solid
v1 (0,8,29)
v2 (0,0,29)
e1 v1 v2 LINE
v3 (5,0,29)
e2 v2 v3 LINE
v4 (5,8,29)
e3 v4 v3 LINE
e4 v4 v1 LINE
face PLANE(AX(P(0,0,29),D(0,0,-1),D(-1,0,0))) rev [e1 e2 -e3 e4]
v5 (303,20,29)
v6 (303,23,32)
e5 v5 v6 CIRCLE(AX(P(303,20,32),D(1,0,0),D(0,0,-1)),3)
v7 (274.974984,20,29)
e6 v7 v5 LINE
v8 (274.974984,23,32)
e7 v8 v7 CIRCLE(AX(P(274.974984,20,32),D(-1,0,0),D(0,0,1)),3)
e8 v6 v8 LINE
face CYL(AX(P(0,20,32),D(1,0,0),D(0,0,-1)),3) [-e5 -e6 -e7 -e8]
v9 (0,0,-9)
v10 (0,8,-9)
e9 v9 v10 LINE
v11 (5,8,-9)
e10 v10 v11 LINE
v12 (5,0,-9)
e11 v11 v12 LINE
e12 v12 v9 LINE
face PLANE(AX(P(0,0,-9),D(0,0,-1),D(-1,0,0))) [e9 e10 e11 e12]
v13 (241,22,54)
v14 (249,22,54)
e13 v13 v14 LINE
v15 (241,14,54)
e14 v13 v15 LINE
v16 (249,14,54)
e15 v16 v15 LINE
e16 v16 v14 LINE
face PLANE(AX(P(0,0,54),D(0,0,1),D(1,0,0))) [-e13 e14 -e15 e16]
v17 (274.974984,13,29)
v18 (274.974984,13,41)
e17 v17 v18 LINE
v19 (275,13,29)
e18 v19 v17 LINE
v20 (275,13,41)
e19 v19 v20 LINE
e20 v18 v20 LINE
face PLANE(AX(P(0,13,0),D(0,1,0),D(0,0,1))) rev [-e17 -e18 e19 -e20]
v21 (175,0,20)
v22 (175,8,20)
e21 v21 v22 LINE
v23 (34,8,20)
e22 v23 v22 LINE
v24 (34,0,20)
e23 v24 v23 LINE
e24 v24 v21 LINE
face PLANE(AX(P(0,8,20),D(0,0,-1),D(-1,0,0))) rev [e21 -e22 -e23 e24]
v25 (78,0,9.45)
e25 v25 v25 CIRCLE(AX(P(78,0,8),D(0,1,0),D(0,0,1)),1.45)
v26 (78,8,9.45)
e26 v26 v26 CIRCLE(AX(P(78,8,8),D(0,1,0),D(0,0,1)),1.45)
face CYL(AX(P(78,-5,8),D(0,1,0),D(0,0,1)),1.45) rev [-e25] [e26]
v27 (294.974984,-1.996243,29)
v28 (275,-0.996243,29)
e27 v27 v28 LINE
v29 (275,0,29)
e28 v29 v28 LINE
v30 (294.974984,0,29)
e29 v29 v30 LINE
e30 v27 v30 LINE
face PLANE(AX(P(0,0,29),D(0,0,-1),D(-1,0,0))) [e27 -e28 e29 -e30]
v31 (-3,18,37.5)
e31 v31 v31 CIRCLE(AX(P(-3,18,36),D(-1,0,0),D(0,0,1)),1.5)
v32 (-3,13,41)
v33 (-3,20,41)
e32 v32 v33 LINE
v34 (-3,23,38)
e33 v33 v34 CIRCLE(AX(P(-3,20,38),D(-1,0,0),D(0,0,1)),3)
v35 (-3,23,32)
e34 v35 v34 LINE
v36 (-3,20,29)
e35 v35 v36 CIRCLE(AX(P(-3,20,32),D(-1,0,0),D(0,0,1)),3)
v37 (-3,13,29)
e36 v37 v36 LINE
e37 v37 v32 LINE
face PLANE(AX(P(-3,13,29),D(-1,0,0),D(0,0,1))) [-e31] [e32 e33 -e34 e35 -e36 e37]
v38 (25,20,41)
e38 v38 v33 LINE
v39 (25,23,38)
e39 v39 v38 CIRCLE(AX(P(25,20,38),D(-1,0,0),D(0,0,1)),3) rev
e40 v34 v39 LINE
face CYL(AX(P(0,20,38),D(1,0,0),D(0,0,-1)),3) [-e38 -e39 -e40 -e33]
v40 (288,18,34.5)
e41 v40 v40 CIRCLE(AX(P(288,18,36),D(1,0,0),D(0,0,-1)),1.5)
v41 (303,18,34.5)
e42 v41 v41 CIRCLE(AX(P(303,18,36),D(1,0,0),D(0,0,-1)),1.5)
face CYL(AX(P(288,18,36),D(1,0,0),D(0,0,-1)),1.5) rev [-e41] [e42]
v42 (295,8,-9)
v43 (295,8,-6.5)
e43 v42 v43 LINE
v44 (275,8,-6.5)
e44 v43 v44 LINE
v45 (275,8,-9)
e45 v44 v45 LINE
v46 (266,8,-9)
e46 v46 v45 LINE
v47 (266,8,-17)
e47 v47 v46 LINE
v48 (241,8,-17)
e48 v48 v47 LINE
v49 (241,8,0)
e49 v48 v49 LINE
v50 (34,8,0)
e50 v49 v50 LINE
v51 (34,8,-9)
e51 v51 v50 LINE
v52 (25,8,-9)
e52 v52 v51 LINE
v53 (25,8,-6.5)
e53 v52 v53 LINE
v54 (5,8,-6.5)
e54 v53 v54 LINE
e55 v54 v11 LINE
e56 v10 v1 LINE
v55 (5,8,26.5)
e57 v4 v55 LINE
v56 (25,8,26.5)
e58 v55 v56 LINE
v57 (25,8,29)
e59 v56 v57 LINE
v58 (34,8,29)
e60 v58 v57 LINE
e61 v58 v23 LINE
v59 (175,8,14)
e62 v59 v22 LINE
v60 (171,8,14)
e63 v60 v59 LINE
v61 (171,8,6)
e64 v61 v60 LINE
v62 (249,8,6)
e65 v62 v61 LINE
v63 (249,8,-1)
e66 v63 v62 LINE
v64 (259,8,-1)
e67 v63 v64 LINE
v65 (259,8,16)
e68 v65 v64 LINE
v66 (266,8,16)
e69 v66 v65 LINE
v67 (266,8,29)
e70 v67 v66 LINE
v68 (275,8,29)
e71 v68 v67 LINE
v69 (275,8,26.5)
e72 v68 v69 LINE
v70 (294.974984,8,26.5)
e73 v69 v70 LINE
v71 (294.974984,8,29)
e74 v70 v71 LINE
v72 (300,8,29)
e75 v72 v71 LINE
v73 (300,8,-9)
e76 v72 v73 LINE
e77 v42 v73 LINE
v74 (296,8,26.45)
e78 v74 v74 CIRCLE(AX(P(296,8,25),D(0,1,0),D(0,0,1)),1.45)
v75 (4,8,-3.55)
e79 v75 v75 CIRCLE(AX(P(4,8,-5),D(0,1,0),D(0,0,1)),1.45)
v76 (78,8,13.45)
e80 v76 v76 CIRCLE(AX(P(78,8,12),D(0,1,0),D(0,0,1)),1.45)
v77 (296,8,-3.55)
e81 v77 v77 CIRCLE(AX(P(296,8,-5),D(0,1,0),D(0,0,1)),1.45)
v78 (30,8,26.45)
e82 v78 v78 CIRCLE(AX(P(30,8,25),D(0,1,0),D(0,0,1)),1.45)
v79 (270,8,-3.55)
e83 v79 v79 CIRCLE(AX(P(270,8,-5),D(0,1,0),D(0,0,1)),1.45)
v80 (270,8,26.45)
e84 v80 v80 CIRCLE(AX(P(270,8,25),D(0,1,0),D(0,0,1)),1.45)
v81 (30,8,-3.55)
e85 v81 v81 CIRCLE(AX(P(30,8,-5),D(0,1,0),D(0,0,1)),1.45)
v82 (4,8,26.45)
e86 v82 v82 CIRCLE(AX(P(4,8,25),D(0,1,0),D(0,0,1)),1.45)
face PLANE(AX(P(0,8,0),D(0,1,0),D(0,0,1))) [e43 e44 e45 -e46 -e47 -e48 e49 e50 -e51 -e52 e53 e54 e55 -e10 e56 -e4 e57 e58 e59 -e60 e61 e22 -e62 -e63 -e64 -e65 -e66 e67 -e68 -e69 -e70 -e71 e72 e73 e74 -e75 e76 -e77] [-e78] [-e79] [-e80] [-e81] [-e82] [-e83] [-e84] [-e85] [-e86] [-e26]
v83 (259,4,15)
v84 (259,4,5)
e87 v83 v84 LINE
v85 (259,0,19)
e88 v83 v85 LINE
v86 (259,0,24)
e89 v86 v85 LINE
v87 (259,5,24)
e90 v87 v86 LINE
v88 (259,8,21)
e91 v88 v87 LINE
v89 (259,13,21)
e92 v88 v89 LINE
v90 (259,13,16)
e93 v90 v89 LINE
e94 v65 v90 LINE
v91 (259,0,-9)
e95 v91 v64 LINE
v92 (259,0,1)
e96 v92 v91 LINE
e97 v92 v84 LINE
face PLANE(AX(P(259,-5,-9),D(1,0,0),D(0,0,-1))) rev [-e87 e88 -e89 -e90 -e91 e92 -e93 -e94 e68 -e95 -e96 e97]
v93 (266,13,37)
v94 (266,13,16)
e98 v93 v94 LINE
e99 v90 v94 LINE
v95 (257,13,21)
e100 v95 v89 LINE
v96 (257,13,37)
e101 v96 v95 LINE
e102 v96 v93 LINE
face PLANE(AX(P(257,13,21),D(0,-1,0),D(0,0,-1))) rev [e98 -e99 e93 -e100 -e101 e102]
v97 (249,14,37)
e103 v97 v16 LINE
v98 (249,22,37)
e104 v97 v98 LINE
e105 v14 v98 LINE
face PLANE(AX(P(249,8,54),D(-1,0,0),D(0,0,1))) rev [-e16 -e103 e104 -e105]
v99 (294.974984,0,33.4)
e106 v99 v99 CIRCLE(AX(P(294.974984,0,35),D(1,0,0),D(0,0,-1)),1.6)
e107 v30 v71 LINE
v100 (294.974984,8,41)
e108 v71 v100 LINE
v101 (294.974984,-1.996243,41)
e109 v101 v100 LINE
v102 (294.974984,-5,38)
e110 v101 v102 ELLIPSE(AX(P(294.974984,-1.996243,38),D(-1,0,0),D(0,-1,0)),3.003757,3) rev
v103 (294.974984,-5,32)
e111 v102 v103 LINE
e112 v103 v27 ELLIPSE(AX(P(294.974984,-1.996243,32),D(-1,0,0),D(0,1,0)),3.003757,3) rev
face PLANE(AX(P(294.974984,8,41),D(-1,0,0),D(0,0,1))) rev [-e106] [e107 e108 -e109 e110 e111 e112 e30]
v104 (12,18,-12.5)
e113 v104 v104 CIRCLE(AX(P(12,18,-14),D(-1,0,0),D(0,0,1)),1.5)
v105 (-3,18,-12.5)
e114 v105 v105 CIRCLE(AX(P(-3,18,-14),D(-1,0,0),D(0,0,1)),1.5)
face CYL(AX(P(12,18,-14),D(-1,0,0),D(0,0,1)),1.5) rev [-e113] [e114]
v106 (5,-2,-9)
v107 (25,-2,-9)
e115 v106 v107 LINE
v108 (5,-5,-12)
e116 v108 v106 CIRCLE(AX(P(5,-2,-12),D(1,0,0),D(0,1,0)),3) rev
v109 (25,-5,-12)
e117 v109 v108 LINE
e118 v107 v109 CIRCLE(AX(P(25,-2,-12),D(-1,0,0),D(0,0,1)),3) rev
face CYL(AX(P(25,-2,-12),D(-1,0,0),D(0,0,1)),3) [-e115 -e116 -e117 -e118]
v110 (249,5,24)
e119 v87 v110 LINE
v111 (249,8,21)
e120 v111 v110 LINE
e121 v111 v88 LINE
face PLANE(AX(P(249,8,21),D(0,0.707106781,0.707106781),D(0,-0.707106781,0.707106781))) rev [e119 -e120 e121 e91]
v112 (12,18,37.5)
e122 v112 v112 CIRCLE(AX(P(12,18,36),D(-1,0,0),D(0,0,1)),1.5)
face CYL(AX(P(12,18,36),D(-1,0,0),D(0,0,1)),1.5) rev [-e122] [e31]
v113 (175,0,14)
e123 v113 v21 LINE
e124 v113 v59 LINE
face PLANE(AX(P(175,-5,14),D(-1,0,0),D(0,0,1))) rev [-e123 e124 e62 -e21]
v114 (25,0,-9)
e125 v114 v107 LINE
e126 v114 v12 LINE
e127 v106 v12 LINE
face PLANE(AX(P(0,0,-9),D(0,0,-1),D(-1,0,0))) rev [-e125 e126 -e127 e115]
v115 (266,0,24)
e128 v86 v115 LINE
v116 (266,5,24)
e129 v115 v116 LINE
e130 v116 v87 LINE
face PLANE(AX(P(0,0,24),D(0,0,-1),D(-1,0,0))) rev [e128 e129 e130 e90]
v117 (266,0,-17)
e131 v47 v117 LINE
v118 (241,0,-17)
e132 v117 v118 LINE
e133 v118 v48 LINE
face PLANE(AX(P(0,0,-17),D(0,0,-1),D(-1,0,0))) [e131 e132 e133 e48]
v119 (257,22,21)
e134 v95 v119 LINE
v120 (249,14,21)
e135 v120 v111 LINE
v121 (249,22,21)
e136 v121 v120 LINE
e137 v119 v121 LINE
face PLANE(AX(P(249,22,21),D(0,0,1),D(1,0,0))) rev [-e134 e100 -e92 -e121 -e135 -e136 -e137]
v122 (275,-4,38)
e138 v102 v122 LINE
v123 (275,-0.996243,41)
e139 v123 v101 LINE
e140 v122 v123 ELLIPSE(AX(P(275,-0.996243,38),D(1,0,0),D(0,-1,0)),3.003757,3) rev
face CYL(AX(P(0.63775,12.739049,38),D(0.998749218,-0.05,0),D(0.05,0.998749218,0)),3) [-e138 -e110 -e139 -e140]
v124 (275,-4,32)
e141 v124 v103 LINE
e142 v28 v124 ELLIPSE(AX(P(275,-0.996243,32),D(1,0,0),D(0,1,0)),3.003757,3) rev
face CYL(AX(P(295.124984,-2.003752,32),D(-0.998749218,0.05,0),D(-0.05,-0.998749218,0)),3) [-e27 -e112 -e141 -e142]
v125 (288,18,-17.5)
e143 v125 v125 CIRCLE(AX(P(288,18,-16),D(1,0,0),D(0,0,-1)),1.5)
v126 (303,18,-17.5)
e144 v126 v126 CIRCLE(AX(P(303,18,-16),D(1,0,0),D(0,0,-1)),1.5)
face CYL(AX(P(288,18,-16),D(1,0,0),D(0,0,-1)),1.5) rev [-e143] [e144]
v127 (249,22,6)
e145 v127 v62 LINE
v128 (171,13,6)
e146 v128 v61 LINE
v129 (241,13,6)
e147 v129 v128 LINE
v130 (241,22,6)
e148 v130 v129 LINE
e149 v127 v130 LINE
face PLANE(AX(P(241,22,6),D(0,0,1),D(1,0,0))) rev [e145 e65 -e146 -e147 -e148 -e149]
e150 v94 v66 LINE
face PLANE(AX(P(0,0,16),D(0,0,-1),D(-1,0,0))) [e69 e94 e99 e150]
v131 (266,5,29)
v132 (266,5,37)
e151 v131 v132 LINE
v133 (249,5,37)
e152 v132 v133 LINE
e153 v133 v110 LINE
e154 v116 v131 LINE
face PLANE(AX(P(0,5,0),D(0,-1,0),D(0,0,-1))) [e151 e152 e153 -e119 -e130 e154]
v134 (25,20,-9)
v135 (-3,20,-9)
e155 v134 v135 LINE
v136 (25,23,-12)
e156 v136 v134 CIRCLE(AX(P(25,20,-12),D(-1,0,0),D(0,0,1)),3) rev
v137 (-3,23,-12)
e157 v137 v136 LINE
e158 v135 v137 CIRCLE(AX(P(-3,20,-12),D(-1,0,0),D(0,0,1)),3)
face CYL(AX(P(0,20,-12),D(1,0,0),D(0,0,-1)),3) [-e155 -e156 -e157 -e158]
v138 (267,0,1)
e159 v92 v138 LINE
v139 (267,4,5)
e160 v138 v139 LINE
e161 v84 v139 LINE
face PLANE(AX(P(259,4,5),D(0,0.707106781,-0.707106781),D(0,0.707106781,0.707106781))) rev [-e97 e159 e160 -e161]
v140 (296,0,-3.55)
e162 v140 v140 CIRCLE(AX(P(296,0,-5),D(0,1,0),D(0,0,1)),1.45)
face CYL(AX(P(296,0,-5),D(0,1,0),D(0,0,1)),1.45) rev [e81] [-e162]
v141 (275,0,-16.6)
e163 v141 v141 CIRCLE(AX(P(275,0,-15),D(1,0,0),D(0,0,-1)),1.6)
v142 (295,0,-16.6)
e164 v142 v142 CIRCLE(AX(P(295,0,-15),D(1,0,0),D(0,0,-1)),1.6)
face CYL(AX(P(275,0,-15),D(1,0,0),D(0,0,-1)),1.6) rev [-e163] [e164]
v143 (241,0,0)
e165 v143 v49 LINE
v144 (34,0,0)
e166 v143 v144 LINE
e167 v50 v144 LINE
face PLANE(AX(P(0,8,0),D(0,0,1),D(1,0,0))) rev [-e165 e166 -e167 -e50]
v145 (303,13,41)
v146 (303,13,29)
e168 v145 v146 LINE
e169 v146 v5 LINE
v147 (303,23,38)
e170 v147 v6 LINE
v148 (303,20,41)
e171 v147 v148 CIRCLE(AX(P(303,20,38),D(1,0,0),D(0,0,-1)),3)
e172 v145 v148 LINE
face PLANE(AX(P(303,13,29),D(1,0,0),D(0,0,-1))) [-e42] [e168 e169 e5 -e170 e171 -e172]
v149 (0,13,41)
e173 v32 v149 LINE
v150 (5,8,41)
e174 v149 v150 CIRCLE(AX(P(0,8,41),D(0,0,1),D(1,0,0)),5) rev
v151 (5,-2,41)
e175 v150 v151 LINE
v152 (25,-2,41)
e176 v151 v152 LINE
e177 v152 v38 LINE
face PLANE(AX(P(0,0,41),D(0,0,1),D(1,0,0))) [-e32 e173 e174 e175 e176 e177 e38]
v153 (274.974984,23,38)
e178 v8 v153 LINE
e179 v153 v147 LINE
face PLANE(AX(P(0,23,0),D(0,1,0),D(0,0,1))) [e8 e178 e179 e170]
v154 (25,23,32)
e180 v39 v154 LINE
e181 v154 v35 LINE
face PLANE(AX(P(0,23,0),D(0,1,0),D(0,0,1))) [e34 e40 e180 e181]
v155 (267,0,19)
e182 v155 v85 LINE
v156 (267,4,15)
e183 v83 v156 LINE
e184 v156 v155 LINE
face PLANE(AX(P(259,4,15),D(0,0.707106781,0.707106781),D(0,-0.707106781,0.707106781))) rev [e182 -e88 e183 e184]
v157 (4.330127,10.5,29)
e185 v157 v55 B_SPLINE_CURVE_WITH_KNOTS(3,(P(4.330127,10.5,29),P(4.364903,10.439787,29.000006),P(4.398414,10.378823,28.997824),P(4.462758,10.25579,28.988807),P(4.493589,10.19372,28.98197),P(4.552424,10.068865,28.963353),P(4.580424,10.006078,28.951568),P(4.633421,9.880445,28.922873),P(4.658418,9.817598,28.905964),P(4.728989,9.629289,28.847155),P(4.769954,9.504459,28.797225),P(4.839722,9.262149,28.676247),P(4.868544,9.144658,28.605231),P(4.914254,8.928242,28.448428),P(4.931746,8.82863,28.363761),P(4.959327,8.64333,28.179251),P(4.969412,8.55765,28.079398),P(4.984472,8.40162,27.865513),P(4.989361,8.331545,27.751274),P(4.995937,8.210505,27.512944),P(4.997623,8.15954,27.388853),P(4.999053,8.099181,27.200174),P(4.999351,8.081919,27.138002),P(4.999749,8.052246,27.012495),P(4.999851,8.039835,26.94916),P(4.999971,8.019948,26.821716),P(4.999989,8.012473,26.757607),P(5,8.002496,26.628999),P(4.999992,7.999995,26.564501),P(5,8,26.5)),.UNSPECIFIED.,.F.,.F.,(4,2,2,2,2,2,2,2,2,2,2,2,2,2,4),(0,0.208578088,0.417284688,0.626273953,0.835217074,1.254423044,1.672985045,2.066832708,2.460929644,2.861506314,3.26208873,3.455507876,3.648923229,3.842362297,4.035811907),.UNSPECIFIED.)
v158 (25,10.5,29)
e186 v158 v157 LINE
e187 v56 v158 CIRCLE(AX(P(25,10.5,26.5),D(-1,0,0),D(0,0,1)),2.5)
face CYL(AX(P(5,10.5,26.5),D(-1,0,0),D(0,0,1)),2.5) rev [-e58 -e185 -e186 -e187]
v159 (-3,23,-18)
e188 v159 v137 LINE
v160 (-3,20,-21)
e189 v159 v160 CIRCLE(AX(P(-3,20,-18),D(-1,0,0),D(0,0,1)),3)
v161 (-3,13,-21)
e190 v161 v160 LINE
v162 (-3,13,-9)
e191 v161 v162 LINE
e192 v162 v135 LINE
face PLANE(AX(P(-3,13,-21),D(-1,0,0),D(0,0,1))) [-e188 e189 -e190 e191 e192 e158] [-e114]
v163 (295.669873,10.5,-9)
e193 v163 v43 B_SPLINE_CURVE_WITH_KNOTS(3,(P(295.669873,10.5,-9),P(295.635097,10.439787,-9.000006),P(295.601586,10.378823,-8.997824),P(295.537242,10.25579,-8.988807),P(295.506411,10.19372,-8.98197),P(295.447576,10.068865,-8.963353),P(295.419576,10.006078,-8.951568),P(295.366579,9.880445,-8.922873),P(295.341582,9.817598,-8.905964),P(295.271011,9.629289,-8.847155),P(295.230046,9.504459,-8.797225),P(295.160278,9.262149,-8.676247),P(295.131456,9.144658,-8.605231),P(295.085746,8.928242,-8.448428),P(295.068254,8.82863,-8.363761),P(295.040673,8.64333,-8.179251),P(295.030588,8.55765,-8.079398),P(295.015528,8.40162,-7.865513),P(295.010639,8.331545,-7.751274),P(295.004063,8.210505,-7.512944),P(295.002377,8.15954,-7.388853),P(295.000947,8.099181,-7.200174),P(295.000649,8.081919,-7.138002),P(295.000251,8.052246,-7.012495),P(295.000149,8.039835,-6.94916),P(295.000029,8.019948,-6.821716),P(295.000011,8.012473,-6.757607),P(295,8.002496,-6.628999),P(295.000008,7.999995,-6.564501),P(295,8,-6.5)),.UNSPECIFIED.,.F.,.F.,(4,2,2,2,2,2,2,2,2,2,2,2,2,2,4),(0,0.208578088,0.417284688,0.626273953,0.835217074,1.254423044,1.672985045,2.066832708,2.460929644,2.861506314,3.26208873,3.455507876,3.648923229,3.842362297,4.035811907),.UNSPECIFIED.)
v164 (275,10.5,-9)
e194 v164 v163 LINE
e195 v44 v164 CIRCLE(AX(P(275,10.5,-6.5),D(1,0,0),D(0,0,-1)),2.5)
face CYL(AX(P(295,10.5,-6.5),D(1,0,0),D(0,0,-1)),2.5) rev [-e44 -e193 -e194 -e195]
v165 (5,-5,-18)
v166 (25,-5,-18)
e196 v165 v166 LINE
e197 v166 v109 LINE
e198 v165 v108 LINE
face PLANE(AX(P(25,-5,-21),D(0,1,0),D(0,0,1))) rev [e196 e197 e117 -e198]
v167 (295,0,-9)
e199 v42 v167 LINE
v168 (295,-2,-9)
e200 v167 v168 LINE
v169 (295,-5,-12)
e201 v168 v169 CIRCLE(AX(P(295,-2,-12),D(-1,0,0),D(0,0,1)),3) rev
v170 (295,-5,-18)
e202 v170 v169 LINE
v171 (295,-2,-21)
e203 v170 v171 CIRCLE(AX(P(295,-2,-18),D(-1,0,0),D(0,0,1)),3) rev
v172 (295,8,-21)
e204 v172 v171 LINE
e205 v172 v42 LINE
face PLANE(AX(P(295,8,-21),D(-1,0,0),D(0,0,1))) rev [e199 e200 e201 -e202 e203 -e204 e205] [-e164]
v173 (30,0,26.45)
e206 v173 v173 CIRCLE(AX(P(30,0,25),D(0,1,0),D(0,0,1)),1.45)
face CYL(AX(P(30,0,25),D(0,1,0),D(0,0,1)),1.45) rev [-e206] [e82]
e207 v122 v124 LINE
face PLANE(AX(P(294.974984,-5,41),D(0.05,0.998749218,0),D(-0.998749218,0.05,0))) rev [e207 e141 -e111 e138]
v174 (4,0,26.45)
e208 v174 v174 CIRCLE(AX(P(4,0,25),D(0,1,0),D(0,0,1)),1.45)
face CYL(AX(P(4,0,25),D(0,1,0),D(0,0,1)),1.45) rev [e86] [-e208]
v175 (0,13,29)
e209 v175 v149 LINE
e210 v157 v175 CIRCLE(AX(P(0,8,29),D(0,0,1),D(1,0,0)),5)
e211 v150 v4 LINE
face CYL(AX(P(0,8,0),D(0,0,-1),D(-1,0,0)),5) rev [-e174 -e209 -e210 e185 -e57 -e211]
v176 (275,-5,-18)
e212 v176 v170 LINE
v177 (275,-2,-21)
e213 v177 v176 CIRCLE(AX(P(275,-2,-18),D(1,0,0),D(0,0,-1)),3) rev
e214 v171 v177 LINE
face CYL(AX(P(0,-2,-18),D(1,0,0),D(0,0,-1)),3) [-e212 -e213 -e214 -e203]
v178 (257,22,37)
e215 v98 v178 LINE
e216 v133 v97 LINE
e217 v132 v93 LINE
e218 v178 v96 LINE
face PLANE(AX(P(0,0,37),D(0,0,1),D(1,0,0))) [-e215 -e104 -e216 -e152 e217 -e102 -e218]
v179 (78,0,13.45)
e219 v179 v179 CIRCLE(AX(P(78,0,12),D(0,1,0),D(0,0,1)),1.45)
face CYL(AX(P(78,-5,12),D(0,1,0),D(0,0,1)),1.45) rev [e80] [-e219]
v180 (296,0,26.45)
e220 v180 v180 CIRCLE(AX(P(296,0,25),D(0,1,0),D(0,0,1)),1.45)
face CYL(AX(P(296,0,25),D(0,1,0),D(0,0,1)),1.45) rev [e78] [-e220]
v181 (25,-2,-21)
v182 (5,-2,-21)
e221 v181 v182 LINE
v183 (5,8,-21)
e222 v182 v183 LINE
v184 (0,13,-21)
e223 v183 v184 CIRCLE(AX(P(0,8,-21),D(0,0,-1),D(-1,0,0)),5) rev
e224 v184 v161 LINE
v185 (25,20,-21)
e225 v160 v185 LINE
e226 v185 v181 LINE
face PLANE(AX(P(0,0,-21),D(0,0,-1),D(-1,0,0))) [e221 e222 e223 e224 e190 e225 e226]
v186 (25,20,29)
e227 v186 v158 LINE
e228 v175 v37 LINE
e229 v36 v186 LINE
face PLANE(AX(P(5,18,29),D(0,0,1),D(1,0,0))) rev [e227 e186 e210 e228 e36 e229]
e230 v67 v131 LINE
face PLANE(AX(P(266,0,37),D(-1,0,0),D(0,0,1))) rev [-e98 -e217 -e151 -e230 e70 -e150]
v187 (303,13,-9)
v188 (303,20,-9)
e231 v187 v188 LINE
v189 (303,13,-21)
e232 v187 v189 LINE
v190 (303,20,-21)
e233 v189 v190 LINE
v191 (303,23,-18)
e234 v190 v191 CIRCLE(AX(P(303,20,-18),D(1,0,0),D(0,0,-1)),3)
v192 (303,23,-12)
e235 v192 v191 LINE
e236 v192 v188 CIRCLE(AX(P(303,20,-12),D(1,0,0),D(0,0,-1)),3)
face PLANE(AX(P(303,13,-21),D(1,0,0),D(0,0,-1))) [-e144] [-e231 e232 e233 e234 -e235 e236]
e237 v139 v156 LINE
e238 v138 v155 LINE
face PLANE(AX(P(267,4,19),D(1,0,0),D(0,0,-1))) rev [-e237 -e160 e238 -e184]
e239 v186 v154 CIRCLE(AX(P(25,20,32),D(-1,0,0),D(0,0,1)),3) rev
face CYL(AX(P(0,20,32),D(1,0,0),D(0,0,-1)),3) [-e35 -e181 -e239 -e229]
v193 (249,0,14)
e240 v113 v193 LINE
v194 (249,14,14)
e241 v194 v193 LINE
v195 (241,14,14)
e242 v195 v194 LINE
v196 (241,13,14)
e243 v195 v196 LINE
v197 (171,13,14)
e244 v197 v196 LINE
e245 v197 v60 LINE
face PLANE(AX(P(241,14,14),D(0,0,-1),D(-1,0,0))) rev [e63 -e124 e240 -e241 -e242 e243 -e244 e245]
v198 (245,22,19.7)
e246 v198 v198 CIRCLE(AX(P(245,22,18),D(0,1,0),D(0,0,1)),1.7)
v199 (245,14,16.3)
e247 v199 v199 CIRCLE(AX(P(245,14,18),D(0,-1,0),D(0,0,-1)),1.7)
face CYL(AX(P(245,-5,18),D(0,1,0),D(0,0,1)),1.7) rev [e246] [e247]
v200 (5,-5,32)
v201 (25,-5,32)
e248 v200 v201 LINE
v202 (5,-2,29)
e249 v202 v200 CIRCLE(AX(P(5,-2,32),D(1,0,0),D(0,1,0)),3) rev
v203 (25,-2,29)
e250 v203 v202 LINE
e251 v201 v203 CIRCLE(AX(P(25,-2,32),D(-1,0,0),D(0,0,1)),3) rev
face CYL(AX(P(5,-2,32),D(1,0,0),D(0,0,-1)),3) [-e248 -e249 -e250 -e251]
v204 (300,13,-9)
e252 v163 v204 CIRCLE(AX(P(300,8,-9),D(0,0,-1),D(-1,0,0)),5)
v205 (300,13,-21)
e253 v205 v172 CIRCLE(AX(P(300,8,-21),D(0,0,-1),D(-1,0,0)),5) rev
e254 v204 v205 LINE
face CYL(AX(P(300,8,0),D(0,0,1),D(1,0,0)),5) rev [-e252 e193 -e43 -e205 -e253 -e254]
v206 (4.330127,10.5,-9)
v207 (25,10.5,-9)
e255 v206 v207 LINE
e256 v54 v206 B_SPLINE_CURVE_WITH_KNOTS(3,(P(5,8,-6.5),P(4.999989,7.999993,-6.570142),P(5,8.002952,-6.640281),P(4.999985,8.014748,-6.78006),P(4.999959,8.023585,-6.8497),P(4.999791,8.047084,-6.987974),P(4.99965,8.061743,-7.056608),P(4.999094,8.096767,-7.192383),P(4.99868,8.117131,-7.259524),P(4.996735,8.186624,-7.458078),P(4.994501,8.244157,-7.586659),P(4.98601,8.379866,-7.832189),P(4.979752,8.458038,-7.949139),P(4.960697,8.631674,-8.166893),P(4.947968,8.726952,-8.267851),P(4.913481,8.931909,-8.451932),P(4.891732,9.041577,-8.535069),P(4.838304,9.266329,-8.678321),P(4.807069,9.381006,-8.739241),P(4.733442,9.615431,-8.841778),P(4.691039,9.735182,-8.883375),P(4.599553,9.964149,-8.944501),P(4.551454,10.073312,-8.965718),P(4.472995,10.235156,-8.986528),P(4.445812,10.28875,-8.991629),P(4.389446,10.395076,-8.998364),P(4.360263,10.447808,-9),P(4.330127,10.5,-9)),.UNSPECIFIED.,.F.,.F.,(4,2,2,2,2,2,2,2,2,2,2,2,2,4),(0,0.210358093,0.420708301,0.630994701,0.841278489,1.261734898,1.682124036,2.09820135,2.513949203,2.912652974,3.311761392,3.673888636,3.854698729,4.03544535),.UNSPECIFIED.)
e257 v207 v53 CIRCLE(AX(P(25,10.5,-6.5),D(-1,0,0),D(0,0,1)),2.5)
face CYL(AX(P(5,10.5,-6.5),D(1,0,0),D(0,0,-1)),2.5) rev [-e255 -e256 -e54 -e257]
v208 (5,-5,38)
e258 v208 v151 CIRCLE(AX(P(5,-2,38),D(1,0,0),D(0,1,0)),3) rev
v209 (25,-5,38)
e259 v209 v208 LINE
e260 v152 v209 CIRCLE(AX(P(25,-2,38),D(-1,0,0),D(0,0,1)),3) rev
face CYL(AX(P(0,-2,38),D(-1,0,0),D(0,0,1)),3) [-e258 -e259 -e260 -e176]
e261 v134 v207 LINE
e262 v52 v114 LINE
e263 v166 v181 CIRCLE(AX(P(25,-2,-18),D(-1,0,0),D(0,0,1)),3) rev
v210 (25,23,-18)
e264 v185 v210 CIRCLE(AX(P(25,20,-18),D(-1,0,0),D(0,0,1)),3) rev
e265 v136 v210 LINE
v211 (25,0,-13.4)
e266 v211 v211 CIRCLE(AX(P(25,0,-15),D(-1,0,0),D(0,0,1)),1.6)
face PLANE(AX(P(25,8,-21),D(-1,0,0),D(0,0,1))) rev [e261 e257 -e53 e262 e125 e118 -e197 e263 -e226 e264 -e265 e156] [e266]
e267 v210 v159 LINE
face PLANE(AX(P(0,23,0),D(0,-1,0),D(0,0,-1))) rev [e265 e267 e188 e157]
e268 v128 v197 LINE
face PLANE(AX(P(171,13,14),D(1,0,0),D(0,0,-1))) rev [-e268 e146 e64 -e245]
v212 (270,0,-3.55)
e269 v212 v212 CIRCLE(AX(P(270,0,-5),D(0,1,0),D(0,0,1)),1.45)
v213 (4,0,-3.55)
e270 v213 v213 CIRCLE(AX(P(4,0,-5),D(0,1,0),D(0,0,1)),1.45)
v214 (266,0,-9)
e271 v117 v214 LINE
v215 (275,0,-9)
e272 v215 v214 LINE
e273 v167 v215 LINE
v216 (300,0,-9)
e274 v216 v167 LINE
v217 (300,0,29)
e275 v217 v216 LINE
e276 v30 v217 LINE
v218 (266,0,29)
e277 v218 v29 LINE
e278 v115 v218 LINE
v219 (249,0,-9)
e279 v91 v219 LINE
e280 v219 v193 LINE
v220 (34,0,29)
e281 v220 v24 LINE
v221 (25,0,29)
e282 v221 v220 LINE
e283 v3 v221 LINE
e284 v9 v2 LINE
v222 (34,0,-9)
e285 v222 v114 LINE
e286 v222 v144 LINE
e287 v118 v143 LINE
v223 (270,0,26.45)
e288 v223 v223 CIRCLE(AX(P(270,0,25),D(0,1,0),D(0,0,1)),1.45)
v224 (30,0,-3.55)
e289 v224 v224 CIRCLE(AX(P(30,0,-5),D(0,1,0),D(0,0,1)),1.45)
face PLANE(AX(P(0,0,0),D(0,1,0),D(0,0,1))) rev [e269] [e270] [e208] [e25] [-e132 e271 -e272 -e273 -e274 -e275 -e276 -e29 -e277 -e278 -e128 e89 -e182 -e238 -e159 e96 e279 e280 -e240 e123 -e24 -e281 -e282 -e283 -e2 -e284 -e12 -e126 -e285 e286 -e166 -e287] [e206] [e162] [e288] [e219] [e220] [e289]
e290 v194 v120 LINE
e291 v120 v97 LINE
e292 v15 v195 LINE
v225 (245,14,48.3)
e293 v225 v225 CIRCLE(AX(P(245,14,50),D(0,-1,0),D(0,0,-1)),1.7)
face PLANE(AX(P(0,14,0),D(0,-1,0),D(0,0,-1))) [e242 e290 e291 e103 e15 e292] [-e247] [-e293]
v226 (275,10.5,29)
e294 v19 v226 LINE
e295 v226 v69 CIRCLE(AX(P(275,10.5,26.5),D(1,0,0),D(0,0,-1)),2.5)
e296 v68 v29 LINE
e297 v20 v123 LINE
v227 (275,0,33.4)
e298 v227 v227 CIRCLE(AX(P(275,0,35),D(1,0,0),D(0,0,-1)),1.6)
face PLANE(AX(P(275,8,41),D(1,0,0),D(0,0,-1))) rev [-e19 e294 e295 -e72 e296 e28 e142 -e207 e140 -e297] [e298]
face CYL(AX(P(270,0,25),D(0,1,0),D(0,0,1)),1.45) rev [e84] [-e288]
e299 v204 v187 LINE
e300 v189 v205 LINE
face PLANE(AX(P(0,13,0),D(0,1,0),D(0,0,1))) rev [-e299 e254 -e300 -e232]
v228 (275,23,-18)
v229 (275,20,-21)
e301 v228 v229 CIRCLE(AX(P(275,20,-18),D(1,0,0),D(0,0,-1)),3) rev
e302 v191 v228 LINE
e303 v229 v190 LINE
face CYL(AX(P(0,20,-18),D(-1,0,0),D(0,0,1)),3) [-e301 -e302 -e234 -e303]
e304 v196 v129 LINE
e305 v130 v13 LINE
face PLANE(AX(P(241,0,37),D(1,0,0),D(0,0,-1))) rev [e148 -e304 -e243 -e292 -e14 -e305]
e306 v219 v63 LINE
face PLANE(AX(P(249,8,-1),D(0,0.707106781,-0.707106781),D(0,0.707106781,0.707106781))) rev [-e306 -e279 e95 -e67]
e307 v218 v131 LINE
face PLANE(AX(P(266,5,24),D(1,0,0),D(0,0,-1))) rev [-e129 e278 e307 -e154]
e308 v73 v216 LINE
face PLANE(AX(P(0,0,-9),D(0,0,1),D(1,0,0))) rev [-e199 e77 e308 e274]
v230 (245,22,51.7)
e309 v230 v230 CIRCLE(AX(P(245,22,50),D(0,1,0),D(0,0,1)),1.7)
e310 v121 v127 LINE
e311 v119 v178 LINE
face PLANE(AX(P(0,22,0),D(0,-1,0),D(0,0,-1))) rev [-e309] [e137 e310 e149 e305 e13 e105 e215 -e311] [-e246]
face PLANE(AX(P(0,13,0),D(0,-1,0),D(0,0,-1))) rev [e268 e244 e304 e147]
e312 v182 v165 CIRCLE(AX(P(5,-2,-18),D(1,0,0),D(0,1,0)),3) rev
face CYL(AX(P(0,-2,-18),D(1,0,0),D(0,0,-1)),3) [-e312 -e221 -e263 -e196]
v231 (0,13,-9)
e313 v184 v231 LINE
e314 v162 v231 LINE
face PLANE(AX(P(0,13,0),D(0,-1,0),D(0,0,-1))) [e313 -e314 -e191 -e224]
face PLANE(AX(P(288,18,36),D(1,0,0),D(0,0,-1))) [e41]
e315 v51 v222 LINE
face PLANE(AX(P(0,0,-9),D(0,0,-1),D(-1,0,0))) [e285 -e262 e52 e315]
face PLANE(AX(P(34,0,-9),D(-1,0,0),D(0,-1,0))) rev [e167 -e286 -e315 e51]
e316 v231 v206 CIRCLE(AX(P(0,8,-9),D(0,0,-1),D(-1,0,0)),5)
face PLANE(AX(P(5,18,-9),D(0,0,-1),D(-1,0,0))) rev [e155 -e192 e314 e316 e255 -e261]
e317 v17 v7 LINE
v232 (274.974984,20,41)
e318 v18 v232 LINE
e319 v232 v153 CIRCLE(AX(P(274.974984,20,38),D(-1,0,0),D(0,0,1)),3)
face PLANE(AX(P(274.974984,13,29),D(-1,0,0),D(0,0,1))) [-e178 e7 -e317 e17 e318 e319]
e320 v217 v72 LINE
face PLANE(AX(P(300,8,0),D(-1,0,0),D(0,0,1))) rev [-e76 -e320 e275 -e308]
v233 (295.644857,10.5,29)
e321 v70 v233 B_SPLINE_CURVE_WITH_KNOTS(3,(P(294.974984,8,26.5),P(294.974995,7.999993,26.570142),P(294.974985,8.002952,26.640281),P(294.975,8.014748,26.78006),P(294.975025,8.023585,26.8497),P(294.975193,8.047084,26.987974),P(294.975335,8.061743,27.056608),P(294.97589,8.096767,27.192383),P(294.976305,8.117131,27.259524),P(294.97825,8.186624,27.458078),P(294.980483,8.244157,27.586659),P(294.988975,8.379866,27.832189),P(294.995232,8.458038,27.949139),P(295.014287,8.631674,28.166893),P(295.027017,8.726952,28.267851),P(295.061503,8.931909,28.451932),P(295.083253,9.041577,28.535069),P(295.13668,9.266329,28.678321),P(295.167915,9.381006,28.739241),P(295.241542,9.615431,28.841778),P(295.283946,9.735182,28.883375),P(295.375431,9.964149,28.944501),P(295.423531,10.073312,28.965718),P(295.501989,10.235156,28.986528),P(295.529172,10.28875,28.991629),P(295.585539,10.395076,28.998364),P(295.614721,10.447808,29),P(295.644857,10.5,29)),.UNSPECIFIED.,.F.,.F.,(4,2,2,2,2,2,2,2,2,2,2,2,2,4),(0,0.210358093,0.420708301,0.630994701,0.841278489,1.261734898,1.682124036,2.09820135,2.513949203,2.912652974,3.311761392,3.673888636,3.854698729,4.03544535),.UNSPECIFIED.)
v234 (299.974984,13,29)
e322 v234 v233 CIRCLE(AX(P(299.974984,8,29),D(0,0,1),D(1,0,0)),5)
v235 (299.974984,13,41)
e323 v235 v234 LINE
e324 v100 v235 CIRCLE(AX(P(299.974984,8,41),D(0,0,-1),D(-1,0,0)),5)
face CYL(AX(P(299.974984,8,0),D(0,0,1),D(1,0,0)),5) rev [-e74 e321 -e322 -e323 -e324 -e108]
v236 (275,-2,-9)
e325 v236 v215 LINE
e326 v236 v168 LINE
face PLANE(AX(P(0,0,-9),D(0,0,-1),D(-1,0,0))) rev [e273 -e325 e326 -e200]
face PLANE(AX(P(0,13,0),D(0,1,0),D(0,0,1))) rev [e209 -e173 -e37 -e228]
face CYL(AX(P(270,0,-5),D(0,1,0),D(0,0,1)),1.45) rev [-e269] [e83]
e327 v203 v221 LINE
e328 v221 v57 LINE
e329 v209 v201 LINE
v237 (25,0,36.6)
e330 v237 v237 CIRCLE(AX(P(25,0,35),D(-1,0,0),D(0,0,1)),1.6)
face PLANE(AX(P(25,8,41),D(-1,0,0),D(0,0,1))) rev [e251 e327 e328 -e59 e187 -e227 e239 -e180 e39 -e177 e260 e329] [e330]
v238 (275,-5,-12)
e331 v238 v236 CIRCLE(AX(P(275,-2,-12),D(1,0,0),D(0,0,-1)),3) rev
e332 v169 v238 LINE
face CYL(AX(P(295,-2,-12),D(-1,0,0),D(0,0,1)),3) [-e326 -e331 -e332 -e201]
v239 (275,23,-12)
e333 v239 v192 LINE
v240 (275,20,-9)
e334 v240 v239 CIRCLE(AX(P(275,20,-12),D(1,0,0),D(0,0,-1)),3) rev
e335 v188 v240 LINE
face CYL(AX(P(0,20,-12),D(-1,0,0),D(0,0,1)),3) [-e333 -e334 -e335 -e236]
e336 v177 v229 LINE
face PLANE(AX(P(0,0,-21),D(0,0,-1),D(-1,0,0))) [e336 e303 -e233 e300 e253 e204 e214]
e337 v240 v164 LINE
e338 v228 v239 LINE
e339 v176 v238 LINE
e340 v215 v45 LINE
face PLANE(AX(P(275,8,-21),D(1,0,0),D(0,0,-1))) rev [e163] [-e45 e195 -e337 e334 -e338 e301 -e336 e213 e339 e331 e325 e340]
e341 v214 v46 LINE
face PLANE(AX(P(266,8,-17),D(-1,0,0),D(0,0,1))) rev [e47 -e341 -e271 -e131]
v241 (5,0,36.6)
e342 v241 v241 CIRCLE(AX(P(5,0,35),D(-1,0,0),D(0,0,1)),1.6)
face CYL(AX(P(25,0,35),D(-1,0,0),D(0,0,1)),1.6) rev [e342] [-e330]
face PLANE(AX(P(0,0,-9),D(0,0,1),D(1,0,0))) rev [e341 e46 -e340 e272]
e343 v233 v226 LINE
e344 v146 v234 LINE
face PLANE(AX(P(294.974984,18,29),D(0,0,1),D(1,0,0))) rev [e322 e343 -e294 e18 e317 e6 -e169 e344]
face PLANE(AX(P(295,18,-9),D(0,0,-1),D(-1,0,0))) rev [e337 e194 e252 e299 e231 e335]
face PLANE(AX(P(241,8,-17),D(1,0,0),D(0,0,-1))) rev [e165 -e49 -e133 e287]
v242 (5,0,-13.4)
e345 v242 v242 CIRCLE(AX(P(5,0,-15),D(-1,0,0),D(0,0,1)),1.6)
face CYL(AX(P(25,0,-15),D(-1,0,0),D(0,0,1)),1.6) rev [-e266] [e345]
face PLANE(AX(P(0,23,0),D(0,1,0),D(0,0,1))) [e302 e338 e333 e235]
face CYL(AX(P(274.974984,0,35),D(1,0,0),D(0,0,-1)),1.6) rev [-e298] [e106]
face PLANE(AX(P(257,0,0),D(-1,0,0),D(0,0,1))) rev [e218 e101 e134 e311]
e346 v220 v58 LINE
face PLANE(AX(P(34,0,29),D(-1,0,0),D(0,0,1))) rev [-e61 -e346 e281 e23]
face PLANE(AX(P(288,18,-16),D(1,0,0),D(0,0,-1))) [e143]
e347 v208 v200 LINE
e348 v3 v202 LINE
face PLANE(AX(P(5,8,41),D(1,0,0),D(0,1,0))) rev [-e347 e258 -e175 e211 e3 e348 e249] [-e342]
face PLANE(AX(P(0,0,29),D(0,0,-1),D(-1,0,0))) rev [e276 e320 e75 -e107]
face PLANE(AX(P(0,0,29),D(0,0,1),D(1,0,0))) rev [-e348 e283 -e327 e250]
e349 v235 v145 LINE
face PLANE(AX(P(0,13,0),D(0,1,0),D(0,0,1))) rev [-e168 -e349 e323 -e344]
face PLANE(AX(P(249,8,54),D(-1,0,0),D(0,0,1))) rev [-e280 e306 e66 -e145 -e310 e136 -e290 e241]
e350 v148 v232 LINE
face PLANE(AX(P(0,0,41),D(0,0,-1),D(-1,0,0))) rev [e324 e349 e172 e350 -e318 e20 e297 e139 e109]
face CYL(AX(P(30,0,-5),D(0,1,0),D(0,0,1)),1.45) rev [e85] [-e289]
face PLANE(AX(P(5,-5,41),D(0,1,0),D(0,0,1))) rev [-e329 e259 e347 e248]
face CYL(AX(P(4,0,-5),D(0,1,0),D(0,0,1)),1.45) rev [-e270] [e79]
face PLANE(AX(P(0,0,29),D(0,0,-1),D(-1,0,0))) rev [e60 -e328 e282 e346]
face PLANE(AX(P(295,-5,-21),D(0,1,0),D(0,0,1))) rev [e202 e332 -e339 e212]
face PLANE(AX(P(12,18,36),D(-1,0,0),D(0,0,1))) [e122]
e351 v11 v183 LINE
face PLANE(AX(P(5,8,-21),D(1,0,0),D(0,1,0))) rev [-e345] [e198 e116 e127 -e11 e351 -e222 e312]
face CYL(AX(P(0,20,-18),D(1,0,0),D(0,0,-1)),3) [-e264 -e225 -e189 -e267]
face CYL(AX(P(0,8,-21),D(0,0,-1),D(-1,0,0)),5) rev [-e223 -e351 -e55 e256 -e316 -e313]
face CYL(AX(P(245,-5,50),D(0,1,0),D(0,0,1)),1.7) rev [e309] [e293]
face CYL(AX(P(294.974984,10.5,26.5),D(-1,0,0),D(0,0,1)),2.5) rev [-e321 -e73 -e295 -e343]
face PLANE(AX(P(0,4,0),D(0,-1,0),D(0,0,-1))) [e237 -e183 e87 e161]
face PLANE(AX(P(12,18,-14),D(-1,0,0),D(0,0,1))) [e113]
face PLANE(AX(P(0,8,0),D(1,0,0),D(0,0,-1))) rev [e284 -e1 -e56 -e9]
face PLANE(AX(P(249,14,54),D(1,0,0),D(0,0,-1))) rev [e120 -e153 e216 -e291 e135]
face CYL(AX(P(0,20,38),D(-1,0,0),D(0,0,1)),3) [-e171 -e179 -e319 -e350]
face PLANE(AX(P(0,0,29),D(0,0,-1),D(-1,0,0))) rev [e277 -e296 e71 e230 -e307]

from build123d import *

# Parameters (mm, degrees)
SKETCH1_W                 = 300
SKETCH1_H                 = 20
BOSS_EXTRUDE1_DEPTH       = 8
SKETCH2_W                 = 34
SKETCH2_H                 = 8
BOSS_EXTRUDE2_DEPTH       = 9
SKETCH3_W                 = 34
SKETCH3_H                 = 8
BOSS_EXTRUDE3_DEPTH       = 9
SKETCH4_R                 = 1.45
CUT_EXTRUDE1_DEPTH        = 302.504560496
SKETCH5_W                 = 25
SKETCH5_H                 = 8
BOSS_EXTRUDE4_DEPTH       = 17
SKETCH6_W                 = 25
SKETCH6_H                 = 8
BOSS_EXTRUDE5_DEPTH       = 17
SKETCH12_W                = 8
SKETCH12_H                = 8
BOSS_EXTRUDE7_DEPTH       = 17
BOSS_EXTRUDE8_DEPTH       = 12
SKETCH15_R                = 1.6
CUT_EXTRUDE7_DEPTH        = 20
SKETCH16_W                = 20
SKETCH16_H                = 13
BOSS_EXTRUDE9_DEPTH       = 12
SKETCH17_R                = 1.6
CUT_EXTRUDE8_DEPTH        = 20
SKETCH18_W                = 20
SKETCH18_H                = 13
BOSS_EXTRUDE10_DEPTH      = 12
CUT_EXTRUDE9_START        = -20
SKETCH19_R                = 1.6
CUT_EXTRUDE9_DEPTH        = 20
SKETCH20_W                = 20
SKETCH20_H                = 13
BOSS_EXTRUDE11_DEPTH      = 12
CUT_EXTRUDE10_START       = -20
SKETCH21_R                = 1.6
CUT_EXTRUDE10_DEPTH       = 20
SKETCH22_W                = 10
SKETCH22_H                = 38
CUT_EXTRUDE11_DEPTH       = 306.0983448
SKETCH23_W                = 8
SKETCH23_H                = 18
CUT_EXTRUDE12_DEPTH       = 4
BOSS_EXTRUDE12_DEPTH      = 10
BOSS_EXTRUDE13_DEPTH      = 8
SKETCH26_W                = 8
SKETCH26_H                = 48
BOSS_EXTRUDE14_DEPTH      = 14
SKETCH27_W                = 8
SKETCH27_H                = 16
BOSS_EXTRUDE15_DEPTH      = 14
SKETCH28_W                = 8
SKETCH28_H                = 40
CUT_EXTRUDE13_DEPTH       = 14
SKETCH30_W                = 16
SKETCH30_H                = 14
BOSS_EXTRUDE16_DEPTH      = 9
SKETCH31_W                = 17
SKETCH31_H                = 8
CUT_EXTRUDE14_DEPTH       = 5
SKETCH32_W                = 16
SKETCH32_H                = 9
CUT_EXTRUDE15_DEPTH       = 9
CUT_EXTRUDE16_DEPTH       = 10
SKETCH34_W                = 7
SKETCH34_H                = 5
CUT_EXTRUDE17_DEPTH       = 5
SKETCH35_W                = 7
SKETCH35_H                = 5
BOSS_EXTRUDE17_DEPTH      = 5
SKETCH36_R                = 1.7
CUT_EXTRUDE18_DEPTH       = 307.014705529
SKETCH37_W                = 70
SKETCH37_H                = 8
BOSS_EXTRUDE18_DEPTH      = 5
SKETCH39_W                = 66
SKETCH39_H                = 6
CUT_EXTRUDE19_DEPTH       = 306.14258962
SKETCH40_W                = 20
SKETCH40_H                = 12
BOSS_EXTRUDE19_DEPTH      = 10
BOSS_EXTRUDE20_DEPTH      = 5
BOSS_EXTRUDE20_DEPTH_BACK = 5
SKETCH41_W                = 28
SKETCH41_H                = 12
SKETCH42_R                = 1.5
CUT_EXTRUDE20_DEPTH       = 15
SKETCH43_W                = 20
SKETCH43_H                = 12
BOSS_EXTRUDE21_DEPTH      = 10
BOSS_EXTRUDE22_DEPTH      = 5
BOSS_EXTRUDE22_DEPTH_BACK = 5
SKETCH44_W                = 28
SKETCH44_H                = 12
SKETCH45_R                = 1.5
CUT_EXTRUDE21_DEPTH       = 15
SKETCH46_W                = 20
SKETCH46_H                = 12
SKETCH46_W_2              = 19.974984355
BOSS_EXTRUDE23_DEPTH      = 10
BOSS_EXTRUDE24_DEPTH      = 5
BOSS_EXTRUDE24_DEPTH_BACK = 5
SKETCH47_W                = 28
SKETCH47_H                = 12
SKETCH47_W_2              = 28.025015645
CUT_EXTRUDE22_START       = -15
SKETCH48_R                = 1.5
CUT_EXTRUDE22_DEPTH       = 15
FILLET1_R                 = 5
FILLET2_R                 = 2.5
FILLET3_R                 = 3
FILLET4_R                 = 3
SKETCH49_R                = 1.45
CUT_EXTRUDE23_DEPTH       = 309.139578763


with BuildPart() as part:
    # Sketch1 → Boss-Extrude1 (new body)
    with BuildSketch(Plane(origin=(0, 0, 0), x_dir=(1, 0, 0), z_dir=(0, 1, 0))):
        with Locations((150, -10)):
            Rectangle(SKETCH1_W, SKETCH1_H)
    extrude(amount=BOSS_EXTRUDE1_DEPTH)

    # Sketch2 → Boss-Extrude2 (add)
    with BuildSketch(Plane.XY.offset(20)):
        with Locations((17, 4)):
            Rectangle(SKETCH2_W, SKETCH2_H)
        with Locations((283, 4)):
            Rectangle(SKETCH2_W, SKETCH2_H)
    extrude(amount=BOSS_EXTRUDE2_DEPTH)

    # Sketch3 → Boss-Extrude3 (add)
    with BuildSketch(Plane(origin=(0, 0, 0), x_dir=(-1, 0, 0), z_dir=(0, 0, -1))):
        with Locations((-17, 4)):
            Rectangle(SKETCH3_W, SKETCH3_H)
        with Locations((-283, 4)):
            Rectangle(SKETCH3_W, SKETCH3_H)
    extrude(amount=BOSS_EXTRUDE3_DEPTH)

    # Sketch4 → Cut-Extrude1 (cut, through all)
    with BuildSketch(Plane(origin=(0, 8, 0), x_dir=(1, 0, 0), z_dir=(0, 1, 0))):
        with Locations(Location((4, 5, 0), (0, 0, 270))):
            Circle(SKETCH4_R)
        with Locations(Location((30, 5, 0), (0, 0, 270))):
            Circle(SKETCH4_R)
        with Locations(Location((30, -25, 0), (0, 0, 270))):
            Circle(SKETCH4_R)
        with Locations(Location((4, -25, 0), (0, 0, 270))):
            Circle(SKETCH4_R)
        with Locations(Location((296, -25, 0), (0, 0, 270))):
            Circle(SKETCH4_R)
        with Locations(Location((296, 5, 0), (0, 0, 270))):
            Circle(SKETCH4_R)
        with Locations(Location((270, -25, 0), (0, 0, 270))):
            Circle(SKETCH4_R)
        with Locations(Location((270, 5, 0), (0, 0, 270))):
            Circle(SKETCH4_R)
    extrude(amount=-CUT_EXTRUDE1_DEPTH, mode=Mode.SUBTRACT)

    # Sketch5 → Boss-Extrude4 (add)
    with BuildSketch(Plane.XY.offset(20)):
        with Locations((253.5, 4)):
            Rectangle(SKETCH5_W, SKETCH5_H)
    extrude(amount=BOSS_EXTRUDE4_DEPTH)

    # Sketch6 → Boss-Extrude5 (add)
    with BuildSketch(Plane(origin=(0, 0, 0), x_dir=(-1, 0, 0), z_dir=(0, 0, -1))):
        with Locations((-253.5, 4)):
            Rectangle(SKETCH6_W, SKETCH6_H)
    extrude(amount=BOSS_EXTRUDE5_DEPTH)

    # Sketch12 → Boss-Extrude7 (add)
    with BuildSketch(Plane.XY.offset(37)):
        with Locations((245, 4)):
            Rectangle(SKETCH12_W, SKETCH12_H)
    extrude(amount=BOSS_EXTRUDE7_DEPTH)

    # Sketch14 → Boss-Extrude8 (add)
    with BuildSketch(Plane.XY.offset(29)):
        Polygon((294.974984355, 8), (275, 8), (275, -4), (294.974984355, -5), align=None)
    extrude(amount=BOSS_EXTRUDE8_DEPTH)

    # Sketch15 → Cut-Extrude7 (cut)
    with BuildSketch(Plane(origin=(294.974984355, 0, 0), x_dir=(0, 0, -1), z_dir=(1, 0, 0))):
        with Locations((-35, 0)):
            Circle(SKETCH15_R)
    extrude(amount=-CUT_EXTRUDE7_DEPTH, mode=Mode.SUBTRACT)

    # Sketch16 → Boss-Extrude9 (add)
    with BuildSketch(Plane(origin=(0, 0, -9), x_dir=(-1, 0, 0), z_dir=(0, 0, -1))):
        with Locations((-285, 1.5)):
            Rectangle(SKETCH16_W, SKETCH16_H)
    extrude(amount=BOSS_EXTRUDE9_DEPTH)

    # Sketch17 → Cut-Extrude8 (cut)
    with BuildSketch(Plane(origin=(295, 0, 0), x_dir=(0, 0, -1), z_dir=(1, 0, 0))):
        with Locations((15, 0)):
            Circle(SKETCH17_R)
    extrude(amount=-CUT_EXTRUDE8_DEPTH, mode=Mode.SUBTRACT)

    # Sketch18 → Boss-Extrude10 (add)
    with BuildSketch(Plane(origin=(0, 0, -9), x_dir=(-1, 0, 0), z_dir=(0, 0, -1))):
        with Locations((-15, 1.5)):
            Rectangle(SKETCH18_W, SKETCH18_H)
    extrude(amount=BOSS_EXTRUDE10_DEPTH)

    # Sketch19 → Cut-Extrude9 (cut)
    with BuildSketch(Plane.ZY.offset(-5).offset(CUT_EXTRUDE9_START)):
        with Locations(Location((-15, 0, 0), (0, 0, 180))):
            Circle(SKETCH19_R)
    extrude(amount=CUT_EXTRUDE9_DEPTH, mode=Mode.SUBTRACT)

    # Sketch20 → Boss-Extrude11 (add)
    with BuildSketch(Plane.XY.offset(29)):
        with Locations((15, 1.5)):
            Rectangle(SKETCH20_W, SKETCH20_H)
    extrude(amount=BOSS_EXTRUDE11_DEPTH)

    # Sketch21 → Cut-Extrude10 (cut)
    with BuildSketch(Plane.ZY.offset(-5).offset(CUT_EXTRUDE10_START)):
        with Locations(Location((35, 0, 0), (0, 0, 180))):
            Circle(SKETCH21_R)
    extrude(amount=CUT_EXTRUDE10_DEPTH, mode=Mode.SUBTRACT)

    # Sketch22 → Cut-Extrude11 (cut, through all)
    with BuildSketch(Plane(origin=(0, 8, 0), x_dir=(1, 0, 0), z_dir=(0, 1, 0))):
        with Locations((254, -10)):
            Rectangle(SKETCH22_W, SKETCH22_H)
    extrude(amount=-CUT_EXTRUDE11_DEPTH, mode=Mode.SUBTRACT)

    # Sketch23 → Cut-Extrude12 (cut)
    with BuildSketch(Plane(origin=(0, 0, 0), x_dir=(-1, 0, 0), z_dir=(0, -1, 0))):
        with Locations((-263, -10)):
            Rectangle(SKETCH23_W, SKETCH23_H)
    extrude(amount=-CUT_EXTRUDE12_DEPTH, mode=Mode.SUBTRACT)

    # Sketch24 → Boss-Extrude12 (add)
    with BuildSketch(Plane.ZY.offset(-259)):
        Polygon((-9, 0), (-9, 8), (-1, 8), align=None)
        Polygon((29, 0), (29, 8), (21, 8), align=None)
    extrude(amount=BOSS_EXTRUDE12_DEPTH)

    # Sketch25 → Boss-Extrude13 (add)
    with BuildSketch(Plane.ZY.offset(-267)):
        Polygon((19, 0), (19, 4), (15, 4), align=None)
        Polygon((1, 4), (5, 4), (1, 0), align=None)
    extrude(amount=BOSS_EXTRUDE13_DEPTH)

    # Sketch26 → Boss-Extrude14 (add)
    with BuildSketch(Plane(origin=(0, 8, 0), x_dir=(1, 0, 0), z_dir=(0, 1, 0))):
        with Locations((245, -30)):
            Rectangle(SKETCH26_W, SKETCH26_H)
    extrude(amount=BOSS_EXTRUDE14_DEPTH)

    # Sketch27 → Boss-Extrude15 (add)
    with BuildSketch(Plane(origin=(0, 8, 0), x_dir=(1, 0, 0), z_dir=(0, 1, 0))):
        with Locations((253, -29)):
            Rectangle(SKETCH27_W, SKETCH27_H)
    extrude(amount=BOSS_EXTRUDE15_DEPTH)

    # Sketch28 → Cut-Extrude13 (cut)
    with BuildSketch(Plane.XZ):
        with Locations((245, 34)):
            Rectangle(SKETCH28_W, SKETCH28_H)
    extrude(amount=-CUT_EXTRUDE13_DEPTH, mode=Mode.SUBTRACT)

    # Sketch30 → Boss-Extrude16 (add)
    with BuildSketch(Plane(origin=(257, 0, 0), x_dir=(0, 0, -1), z_dir=(1, 0, 0))):
        with Locations((-29, 15)):
            Rectangle(SKETCH30_W, SKETCH30_H)
    extrude(amount=BOSS_EXTRUDE16_DEPTH)

    # Sketch31 → Cut-Extrude14 (cut)
    with BuildSketch(Plane(origin=(0, 0, 0), x_dir=(-1, 0, 0), z_dir=(0, -1, 0))):
        with Locations((-257.5, -33)):
            Rectangle(SKETCH31_W, SKETCH31_H)
    extrude(amount=-CUT_EXTRUDE14_DEPTH, mode=Mode.SUBTRACT)

    # Sketch32 → Cut-Extrude15 (cut)
    with BuildSketch(Plane(origin=(266, 0, 0), x_dir=(0, 0, -1), z_dir=(1, 0, 0))):
        with Locations((-29, 17.5)):
            Rectangle(SKETCH32_W, SKETCH32_H)
    extrude(amount=-CUT_EXTRUDE15_DEPTH, mode=Mode.SUBTRACT)

    # Sketch33 → Cut-Extrude16 (cut)
    with BuildSketch(Plane.ZY.offset(-249)):
        Polygon((29, 5), (24, 5), (29, 0), align=None)
    extrude(amount=-CUT_EXTRUDE16_DEPTH, mode=Mode.SUBTRACT)

    # Sketch34 → Cut-Extrude17 (cut)
    with BuildSketch(Plane.XY.offset(29)):
        with Locations((262.5, 2.5)):
            Rectangle(SKETCH34_W, SKETCH34_H)
    extrude(amount=-CUT_EXTRUDE17_DEPTH, mode=Mode.SUBTRACT)

    # Sketch35 → Boss-Extrude17 (add)
    with BuildSketch(Plane(origin=(0, 0, 21), x_dir=(-1, 0, 0), z_dir=(0, 0, -1))):
        with Locations((-262.5, 10.5)):
            Rectangle(SKETCH35_W, SKETCH35_H)
    extrude(amount=BOSS_EXTRUDE17_DEPTH)

    # Sketch36 → Cut-Extrude18 (cut, through all)
    with BuildSketch(Plane(origin=(0, 22, 0), x_dir=(1, 0, 0), z_dir=(0, 1, 0))):
        with Locations(Location((245, -50, 0), (0, 0, 270))):
            Circle(SKETCH36_R)
        with Locations(Location((245, -18, 0), (0, 0, 270))):
            Circle(SKETCH36_R)
    extrude(amount=-CUT_EXTRUDE18_DEPTH, mode=Mode.SUBTRACT)

    # Sketch37 → Boss-Extrude18 (add)
    with BuildSketch(Plane(origin=(0, 8, 0), x_dir=(1, 0, 0), z_dir=(0, 1, 0))):
        with Locations((206, -10)):
            Rectangle(SKETCH37_W, SKETCH37_H)
    extrude(amount=BOSS_EXTRUDE18_DEPTH)

    # Sketch39 → Cut-Extrude19 (cut, through all)
    with BuildSketch(Plane(origin=(0, 8, 0), x_dir=(1, 0, 0), z_dir=(0, 1, 0))):
        with Locations((208, -17)):
            Rectangle(SKETCH39_W, SKETCH39_H)
    extrude(amount=-CUT_EXTRUDE19_DEPTH, mode=Mode.SUBTRACT)

    # Sketch40 → Boss-Extrude19 (add)
    with BuildSketch(Plane(origin=(0, 8, 0), x_dir=(1, 0, 0), z_dir=(0, 1, 0))):
        with Locations((15, 15)):
            Rectangle(SKETCH40_W, SKETCH40_H)
    extrude(amount=BOSS_EXTRUDE19_DEPTH)

    # Sketch41 → Boss-Extrude20 (add, two sides: drawn at the far end of the back side and taken through both)
    with BuildSketch(Plane(origin=(0, 18, 0), x_dir=(1, 0, 0), z_dir=(0, 1, 0)).offset(-BOSS_EXTRUDE20_DEPTH_BACK)):
        with Locations((11, 15)):
            Rectangle(SKETCH41_W, SKETCH41_H)
    extrude(amount=BOSS_EXTRUDE20_DEPTH + BOSS_EXTRUDE20_DEPTH_BACK)

    # Sketch42 → Cut-Extrude20 (cut)
    with BuildSketch(Plane.ZY.offset(3)):
        with Locations((-14, 18)):
            Circle(SKETCH42_R)
    extrude(amount=-CUT_EXTRUDE20_DEPTH, mode=Mode.SUBTRACT)

    # Sketch43 → Boss-Extrude21 (add)
    with BuildSketch(Plane(origin=(0, 8, 0), x_dir=(1, 0, 0), z_dir=(0, 1, 0))):
        with Locations((15, -35)):
            Rectangle(SKETCH43_W, SKETCH43_H)
    extrude(amount=BOSS_EXTRUDE21_DEPTH)

    # Sketch44 → Boss-Extrude22 (add, two sides: drawn at the far end of the back side and taken through both)
    with BuildSketch(Plane(origin=(0, 18, 0), x_dir=(1, 0, 0), z_dir=(0, 1, 0)).offset(-BOSS_EXTRUDE22_DEPTH_BACK)):
        with Locations((11, -35)):
            Rectangle(SKETCH44_W, SKETCH44_H)
    extrude(amount=BOSS_EXTRUDE22_DEPTH + BOSS_EXTRUDE22_DEPTH_BACK)

    # Sketch45 → Cut-Extrude21 (cut)
    with BuildSketch(Plane.ZY.offset(3)):
        with Locations((36, 18)):
            Circle(SKETCH45_R)
    extrude(amount=-CUT_EXTRUDE21_DEPTH, mode=Mode.SUBTRACT)

    # Sketch46 → Boss-Extrude23 (add)
    with BuildSketch(Plane(origin=(0, 8, 0), x_dir=(1, 0, 0), z_dir=(0, 1, 0))):
        with Locations((285, 15)):
            Rectangle(SKETCH46_W, SKETCH46_H)
        with Locations((284.987492178, -35)):
            Rectangle(SKETCH46_W_2, SKETCH46_H)
    extrude(amount=BOSS_EXTRUDE23_DEPTH)

    # Sketch47 → Boss-Extrude24 (add, two sides: drawn at the far end of the back side and taken through both)
    with BuildSketch(Plane(origin=(0, 18, 0), x_dir=(1, 0, 0), z_dir=(0, 1, 0)).offset(-BOSS_EXTRUDE24_DEPTH_BACK)):
        with Locations((289, 15)):
            Rectangle(SKETCH47_W, SKETCH47_H)
        with Locations((288.987492178, -35)):
            Rectangle(SKETCH47_W_2, SKETCH47_H)
    extrude(amount=BOSS_EXTRUDE24_DEPTH + BOSS_EXTRUDE24_DEPTH_BACK)

    # Sketch48 → Cut-Extrude22 (cut)
    with BuildSketch(Plane(origin=(303, 0, 0), x_dir=(0, 0, -1), z_dir=(1, 0, 0)).offset(CUT_EXTRUDE22_START)):
        with Locations((16, 18)):
            Circle(SKETCH48_R)
        with Locations(Location((-36, 18, 0), (0, 0, 180))):
            Circle(SKETCH48_R)
    extrude(amount=CUT_EXTRUDE22_DEPTH, mode=Mode.SUBTRACT)

    # Fillet1
    fillet1_edges = [part.edges().sort_by_distance(p)[0] for p in [
        (294.974984355, 13, 35),
        (295, 13, -15),
        (5, 13, 35),
        (5, 13, -15),
    ]]
    fillet(fillet1_edges, radius=FILLET1_R)

    # Fillet2
    # the kernel refuses this fillet: 2.5 mm, written as the material it adds along each edge
    with BuildSketch(Plane(origin=(-1.25, 8, -9), x_dir=(0, 1, 0), z_dir=(1, 0, 0))) as fillet2_piece_1_section:
        with BuildLine():
            CenterArc((FILLET2_R, FILLET2_R), FILLET2_R, 180, 90)
            Line((0, FILLET2_R), (0, 0))
            Line((0, 0), (FILLET2_R, 0))
        make_face()
    fillet2_piece_1 = extrude(amount=26.25, mode=Mode.PRIVATE)
    fillet2_piece_1 = fillet2_piece_1 - Plane(origin=(0, 8, -8.784630579), x_dir=(1, 0, 0), z_dir=(0, 0, -1)) * Cylinder(5, 63, mode=Mode.PRIVATE)
    add(fillet2_piece_1)
    with BuildSketch(Plane(origin=(25, 8, 29), x_dir=(0, 0, -1), z_dir=(-1, 0, 0))) as fillet2_piece_2_section:
        with BuildLine():
            CenterArc((FILLET2_R, -FILLET2_R), FILLET2_R, 90, 90)
            Line((0, -FILLET2_R), (0, 0))
            Line((0, 0), (FILLET2_R, 0))
        make_face()
    fillet2_piece_2 = extrude(amount=26.25, mode=Mode.PRIVATE)
    fillet2_piece_2 = fillet2_piece_2 - Plane(origin=(0, 8, 28.441580153), x_dir=(1, 0, 0), z_dir=(0, 0, 1)) * Cylinder(5, 63, mode=Mode.PRIVATE)
    add(fillet2_piece_2)
    with BuildSketch(Plane(origin=(301.25, 8, -9), x_dir=(0, 0, 1), z_dir=(-1, 0, 0))) as fillet2_piece_3_section:
        with BuildLine():
            CenterArc((FILLET2_R, FILLET2_R), FILLET2_R, 180, 90)
            Line((0, FILLET2_R), (0, 0))
            Line((0, 0), (FILLET2_R, 0))
        make_face()
    fillet2_piece_3 = extrude(amount=26.25, mode=Mode.PRIVATE)
    fillet2_piece_3 = fillet2_piece_3 - Plane(origin=(300, 8, -8.78460178), x_dir=(-1, 0, 0), z_dir=(0, 0, -1)) * Cylinder(5, 63, mode=Mode.PRIVATE)
    add(fillet2_piece_3)
    with BuildSketch(Plane(origin=(275, 8, 29), x_dir=(0, 0, -1), z_dir=(1, 0, 0))) as fillet2_piece_4_section:
        with BuildLine():
            CenterArc((FILLET2_R, FILLET2_R), FILLET2_R, 180, 90)
            Line((0, FILLET2_R), (0, 0))
            Line((0, 0), (FILLET2_R, 0))
        make_face()
    fillet2_piece_4 = extrude(amount=26.224984355, mode=Mode.PRIVATE)
    fillet2_piece_4 = fillet2_piece_4 - Plane(origin=(299.974984355, 8, 28.441580153), x_dir=(-1, 0, 0), z_dir=(0, 0, 1)) * Cylinder(5, 63, mode=Mode.PRIVATE)
    add(fillet2_piece_4)

    # Fillet3
    fillet3_edges = [part.edges().sort_by_distance(p)[0] for p in [
        (284.987492178, -4.5, 29),
        (284.987492178, -4.5, 41),
        (285, -5, -9),
        (285, -5, -21),
        (15, -5, -9),
        (15, -5, -21),
        (15, -5, 29),
        (15, -5, 41),
    ]]
    fillet(fillet3_edges, radius=FILLET3_R)

    # Fillet4
    fillet4_edges = [part.edges().sort_by_distance(p)[0] for p in [
        (11, 23, -21),
        (11, 23, -9),
        (11, 23, 41),
        (11, 23, 29),
        (289, 23, -9),
        (289, 23, -21),
        (288.987492178, 23, 41),
        (288.987492178, 23, 29),
    ]]
    fillet(fillet4_edges, radius=FILLET4_R)

    # Sketch49 → Cut-Extrude23 (cut, through all)
    with BuildSketch(Plane(origin=(0, 8, 0), x_dir=(1, 0, 0), z_dir=(0, 1, 0))):
        with Locations(Location((78, -8, 0), (0, 0, 270))):
            Circle(SKETCH49_R)
        with Locations(Location((78, -12, 0), (0, 0, 270))):
            Circle(SKETCH49_R)
    extrude(amount=-CUT_EXTRUDE23_DEPTH, mode=Mode.SUBTRACT)


solid = part.part
